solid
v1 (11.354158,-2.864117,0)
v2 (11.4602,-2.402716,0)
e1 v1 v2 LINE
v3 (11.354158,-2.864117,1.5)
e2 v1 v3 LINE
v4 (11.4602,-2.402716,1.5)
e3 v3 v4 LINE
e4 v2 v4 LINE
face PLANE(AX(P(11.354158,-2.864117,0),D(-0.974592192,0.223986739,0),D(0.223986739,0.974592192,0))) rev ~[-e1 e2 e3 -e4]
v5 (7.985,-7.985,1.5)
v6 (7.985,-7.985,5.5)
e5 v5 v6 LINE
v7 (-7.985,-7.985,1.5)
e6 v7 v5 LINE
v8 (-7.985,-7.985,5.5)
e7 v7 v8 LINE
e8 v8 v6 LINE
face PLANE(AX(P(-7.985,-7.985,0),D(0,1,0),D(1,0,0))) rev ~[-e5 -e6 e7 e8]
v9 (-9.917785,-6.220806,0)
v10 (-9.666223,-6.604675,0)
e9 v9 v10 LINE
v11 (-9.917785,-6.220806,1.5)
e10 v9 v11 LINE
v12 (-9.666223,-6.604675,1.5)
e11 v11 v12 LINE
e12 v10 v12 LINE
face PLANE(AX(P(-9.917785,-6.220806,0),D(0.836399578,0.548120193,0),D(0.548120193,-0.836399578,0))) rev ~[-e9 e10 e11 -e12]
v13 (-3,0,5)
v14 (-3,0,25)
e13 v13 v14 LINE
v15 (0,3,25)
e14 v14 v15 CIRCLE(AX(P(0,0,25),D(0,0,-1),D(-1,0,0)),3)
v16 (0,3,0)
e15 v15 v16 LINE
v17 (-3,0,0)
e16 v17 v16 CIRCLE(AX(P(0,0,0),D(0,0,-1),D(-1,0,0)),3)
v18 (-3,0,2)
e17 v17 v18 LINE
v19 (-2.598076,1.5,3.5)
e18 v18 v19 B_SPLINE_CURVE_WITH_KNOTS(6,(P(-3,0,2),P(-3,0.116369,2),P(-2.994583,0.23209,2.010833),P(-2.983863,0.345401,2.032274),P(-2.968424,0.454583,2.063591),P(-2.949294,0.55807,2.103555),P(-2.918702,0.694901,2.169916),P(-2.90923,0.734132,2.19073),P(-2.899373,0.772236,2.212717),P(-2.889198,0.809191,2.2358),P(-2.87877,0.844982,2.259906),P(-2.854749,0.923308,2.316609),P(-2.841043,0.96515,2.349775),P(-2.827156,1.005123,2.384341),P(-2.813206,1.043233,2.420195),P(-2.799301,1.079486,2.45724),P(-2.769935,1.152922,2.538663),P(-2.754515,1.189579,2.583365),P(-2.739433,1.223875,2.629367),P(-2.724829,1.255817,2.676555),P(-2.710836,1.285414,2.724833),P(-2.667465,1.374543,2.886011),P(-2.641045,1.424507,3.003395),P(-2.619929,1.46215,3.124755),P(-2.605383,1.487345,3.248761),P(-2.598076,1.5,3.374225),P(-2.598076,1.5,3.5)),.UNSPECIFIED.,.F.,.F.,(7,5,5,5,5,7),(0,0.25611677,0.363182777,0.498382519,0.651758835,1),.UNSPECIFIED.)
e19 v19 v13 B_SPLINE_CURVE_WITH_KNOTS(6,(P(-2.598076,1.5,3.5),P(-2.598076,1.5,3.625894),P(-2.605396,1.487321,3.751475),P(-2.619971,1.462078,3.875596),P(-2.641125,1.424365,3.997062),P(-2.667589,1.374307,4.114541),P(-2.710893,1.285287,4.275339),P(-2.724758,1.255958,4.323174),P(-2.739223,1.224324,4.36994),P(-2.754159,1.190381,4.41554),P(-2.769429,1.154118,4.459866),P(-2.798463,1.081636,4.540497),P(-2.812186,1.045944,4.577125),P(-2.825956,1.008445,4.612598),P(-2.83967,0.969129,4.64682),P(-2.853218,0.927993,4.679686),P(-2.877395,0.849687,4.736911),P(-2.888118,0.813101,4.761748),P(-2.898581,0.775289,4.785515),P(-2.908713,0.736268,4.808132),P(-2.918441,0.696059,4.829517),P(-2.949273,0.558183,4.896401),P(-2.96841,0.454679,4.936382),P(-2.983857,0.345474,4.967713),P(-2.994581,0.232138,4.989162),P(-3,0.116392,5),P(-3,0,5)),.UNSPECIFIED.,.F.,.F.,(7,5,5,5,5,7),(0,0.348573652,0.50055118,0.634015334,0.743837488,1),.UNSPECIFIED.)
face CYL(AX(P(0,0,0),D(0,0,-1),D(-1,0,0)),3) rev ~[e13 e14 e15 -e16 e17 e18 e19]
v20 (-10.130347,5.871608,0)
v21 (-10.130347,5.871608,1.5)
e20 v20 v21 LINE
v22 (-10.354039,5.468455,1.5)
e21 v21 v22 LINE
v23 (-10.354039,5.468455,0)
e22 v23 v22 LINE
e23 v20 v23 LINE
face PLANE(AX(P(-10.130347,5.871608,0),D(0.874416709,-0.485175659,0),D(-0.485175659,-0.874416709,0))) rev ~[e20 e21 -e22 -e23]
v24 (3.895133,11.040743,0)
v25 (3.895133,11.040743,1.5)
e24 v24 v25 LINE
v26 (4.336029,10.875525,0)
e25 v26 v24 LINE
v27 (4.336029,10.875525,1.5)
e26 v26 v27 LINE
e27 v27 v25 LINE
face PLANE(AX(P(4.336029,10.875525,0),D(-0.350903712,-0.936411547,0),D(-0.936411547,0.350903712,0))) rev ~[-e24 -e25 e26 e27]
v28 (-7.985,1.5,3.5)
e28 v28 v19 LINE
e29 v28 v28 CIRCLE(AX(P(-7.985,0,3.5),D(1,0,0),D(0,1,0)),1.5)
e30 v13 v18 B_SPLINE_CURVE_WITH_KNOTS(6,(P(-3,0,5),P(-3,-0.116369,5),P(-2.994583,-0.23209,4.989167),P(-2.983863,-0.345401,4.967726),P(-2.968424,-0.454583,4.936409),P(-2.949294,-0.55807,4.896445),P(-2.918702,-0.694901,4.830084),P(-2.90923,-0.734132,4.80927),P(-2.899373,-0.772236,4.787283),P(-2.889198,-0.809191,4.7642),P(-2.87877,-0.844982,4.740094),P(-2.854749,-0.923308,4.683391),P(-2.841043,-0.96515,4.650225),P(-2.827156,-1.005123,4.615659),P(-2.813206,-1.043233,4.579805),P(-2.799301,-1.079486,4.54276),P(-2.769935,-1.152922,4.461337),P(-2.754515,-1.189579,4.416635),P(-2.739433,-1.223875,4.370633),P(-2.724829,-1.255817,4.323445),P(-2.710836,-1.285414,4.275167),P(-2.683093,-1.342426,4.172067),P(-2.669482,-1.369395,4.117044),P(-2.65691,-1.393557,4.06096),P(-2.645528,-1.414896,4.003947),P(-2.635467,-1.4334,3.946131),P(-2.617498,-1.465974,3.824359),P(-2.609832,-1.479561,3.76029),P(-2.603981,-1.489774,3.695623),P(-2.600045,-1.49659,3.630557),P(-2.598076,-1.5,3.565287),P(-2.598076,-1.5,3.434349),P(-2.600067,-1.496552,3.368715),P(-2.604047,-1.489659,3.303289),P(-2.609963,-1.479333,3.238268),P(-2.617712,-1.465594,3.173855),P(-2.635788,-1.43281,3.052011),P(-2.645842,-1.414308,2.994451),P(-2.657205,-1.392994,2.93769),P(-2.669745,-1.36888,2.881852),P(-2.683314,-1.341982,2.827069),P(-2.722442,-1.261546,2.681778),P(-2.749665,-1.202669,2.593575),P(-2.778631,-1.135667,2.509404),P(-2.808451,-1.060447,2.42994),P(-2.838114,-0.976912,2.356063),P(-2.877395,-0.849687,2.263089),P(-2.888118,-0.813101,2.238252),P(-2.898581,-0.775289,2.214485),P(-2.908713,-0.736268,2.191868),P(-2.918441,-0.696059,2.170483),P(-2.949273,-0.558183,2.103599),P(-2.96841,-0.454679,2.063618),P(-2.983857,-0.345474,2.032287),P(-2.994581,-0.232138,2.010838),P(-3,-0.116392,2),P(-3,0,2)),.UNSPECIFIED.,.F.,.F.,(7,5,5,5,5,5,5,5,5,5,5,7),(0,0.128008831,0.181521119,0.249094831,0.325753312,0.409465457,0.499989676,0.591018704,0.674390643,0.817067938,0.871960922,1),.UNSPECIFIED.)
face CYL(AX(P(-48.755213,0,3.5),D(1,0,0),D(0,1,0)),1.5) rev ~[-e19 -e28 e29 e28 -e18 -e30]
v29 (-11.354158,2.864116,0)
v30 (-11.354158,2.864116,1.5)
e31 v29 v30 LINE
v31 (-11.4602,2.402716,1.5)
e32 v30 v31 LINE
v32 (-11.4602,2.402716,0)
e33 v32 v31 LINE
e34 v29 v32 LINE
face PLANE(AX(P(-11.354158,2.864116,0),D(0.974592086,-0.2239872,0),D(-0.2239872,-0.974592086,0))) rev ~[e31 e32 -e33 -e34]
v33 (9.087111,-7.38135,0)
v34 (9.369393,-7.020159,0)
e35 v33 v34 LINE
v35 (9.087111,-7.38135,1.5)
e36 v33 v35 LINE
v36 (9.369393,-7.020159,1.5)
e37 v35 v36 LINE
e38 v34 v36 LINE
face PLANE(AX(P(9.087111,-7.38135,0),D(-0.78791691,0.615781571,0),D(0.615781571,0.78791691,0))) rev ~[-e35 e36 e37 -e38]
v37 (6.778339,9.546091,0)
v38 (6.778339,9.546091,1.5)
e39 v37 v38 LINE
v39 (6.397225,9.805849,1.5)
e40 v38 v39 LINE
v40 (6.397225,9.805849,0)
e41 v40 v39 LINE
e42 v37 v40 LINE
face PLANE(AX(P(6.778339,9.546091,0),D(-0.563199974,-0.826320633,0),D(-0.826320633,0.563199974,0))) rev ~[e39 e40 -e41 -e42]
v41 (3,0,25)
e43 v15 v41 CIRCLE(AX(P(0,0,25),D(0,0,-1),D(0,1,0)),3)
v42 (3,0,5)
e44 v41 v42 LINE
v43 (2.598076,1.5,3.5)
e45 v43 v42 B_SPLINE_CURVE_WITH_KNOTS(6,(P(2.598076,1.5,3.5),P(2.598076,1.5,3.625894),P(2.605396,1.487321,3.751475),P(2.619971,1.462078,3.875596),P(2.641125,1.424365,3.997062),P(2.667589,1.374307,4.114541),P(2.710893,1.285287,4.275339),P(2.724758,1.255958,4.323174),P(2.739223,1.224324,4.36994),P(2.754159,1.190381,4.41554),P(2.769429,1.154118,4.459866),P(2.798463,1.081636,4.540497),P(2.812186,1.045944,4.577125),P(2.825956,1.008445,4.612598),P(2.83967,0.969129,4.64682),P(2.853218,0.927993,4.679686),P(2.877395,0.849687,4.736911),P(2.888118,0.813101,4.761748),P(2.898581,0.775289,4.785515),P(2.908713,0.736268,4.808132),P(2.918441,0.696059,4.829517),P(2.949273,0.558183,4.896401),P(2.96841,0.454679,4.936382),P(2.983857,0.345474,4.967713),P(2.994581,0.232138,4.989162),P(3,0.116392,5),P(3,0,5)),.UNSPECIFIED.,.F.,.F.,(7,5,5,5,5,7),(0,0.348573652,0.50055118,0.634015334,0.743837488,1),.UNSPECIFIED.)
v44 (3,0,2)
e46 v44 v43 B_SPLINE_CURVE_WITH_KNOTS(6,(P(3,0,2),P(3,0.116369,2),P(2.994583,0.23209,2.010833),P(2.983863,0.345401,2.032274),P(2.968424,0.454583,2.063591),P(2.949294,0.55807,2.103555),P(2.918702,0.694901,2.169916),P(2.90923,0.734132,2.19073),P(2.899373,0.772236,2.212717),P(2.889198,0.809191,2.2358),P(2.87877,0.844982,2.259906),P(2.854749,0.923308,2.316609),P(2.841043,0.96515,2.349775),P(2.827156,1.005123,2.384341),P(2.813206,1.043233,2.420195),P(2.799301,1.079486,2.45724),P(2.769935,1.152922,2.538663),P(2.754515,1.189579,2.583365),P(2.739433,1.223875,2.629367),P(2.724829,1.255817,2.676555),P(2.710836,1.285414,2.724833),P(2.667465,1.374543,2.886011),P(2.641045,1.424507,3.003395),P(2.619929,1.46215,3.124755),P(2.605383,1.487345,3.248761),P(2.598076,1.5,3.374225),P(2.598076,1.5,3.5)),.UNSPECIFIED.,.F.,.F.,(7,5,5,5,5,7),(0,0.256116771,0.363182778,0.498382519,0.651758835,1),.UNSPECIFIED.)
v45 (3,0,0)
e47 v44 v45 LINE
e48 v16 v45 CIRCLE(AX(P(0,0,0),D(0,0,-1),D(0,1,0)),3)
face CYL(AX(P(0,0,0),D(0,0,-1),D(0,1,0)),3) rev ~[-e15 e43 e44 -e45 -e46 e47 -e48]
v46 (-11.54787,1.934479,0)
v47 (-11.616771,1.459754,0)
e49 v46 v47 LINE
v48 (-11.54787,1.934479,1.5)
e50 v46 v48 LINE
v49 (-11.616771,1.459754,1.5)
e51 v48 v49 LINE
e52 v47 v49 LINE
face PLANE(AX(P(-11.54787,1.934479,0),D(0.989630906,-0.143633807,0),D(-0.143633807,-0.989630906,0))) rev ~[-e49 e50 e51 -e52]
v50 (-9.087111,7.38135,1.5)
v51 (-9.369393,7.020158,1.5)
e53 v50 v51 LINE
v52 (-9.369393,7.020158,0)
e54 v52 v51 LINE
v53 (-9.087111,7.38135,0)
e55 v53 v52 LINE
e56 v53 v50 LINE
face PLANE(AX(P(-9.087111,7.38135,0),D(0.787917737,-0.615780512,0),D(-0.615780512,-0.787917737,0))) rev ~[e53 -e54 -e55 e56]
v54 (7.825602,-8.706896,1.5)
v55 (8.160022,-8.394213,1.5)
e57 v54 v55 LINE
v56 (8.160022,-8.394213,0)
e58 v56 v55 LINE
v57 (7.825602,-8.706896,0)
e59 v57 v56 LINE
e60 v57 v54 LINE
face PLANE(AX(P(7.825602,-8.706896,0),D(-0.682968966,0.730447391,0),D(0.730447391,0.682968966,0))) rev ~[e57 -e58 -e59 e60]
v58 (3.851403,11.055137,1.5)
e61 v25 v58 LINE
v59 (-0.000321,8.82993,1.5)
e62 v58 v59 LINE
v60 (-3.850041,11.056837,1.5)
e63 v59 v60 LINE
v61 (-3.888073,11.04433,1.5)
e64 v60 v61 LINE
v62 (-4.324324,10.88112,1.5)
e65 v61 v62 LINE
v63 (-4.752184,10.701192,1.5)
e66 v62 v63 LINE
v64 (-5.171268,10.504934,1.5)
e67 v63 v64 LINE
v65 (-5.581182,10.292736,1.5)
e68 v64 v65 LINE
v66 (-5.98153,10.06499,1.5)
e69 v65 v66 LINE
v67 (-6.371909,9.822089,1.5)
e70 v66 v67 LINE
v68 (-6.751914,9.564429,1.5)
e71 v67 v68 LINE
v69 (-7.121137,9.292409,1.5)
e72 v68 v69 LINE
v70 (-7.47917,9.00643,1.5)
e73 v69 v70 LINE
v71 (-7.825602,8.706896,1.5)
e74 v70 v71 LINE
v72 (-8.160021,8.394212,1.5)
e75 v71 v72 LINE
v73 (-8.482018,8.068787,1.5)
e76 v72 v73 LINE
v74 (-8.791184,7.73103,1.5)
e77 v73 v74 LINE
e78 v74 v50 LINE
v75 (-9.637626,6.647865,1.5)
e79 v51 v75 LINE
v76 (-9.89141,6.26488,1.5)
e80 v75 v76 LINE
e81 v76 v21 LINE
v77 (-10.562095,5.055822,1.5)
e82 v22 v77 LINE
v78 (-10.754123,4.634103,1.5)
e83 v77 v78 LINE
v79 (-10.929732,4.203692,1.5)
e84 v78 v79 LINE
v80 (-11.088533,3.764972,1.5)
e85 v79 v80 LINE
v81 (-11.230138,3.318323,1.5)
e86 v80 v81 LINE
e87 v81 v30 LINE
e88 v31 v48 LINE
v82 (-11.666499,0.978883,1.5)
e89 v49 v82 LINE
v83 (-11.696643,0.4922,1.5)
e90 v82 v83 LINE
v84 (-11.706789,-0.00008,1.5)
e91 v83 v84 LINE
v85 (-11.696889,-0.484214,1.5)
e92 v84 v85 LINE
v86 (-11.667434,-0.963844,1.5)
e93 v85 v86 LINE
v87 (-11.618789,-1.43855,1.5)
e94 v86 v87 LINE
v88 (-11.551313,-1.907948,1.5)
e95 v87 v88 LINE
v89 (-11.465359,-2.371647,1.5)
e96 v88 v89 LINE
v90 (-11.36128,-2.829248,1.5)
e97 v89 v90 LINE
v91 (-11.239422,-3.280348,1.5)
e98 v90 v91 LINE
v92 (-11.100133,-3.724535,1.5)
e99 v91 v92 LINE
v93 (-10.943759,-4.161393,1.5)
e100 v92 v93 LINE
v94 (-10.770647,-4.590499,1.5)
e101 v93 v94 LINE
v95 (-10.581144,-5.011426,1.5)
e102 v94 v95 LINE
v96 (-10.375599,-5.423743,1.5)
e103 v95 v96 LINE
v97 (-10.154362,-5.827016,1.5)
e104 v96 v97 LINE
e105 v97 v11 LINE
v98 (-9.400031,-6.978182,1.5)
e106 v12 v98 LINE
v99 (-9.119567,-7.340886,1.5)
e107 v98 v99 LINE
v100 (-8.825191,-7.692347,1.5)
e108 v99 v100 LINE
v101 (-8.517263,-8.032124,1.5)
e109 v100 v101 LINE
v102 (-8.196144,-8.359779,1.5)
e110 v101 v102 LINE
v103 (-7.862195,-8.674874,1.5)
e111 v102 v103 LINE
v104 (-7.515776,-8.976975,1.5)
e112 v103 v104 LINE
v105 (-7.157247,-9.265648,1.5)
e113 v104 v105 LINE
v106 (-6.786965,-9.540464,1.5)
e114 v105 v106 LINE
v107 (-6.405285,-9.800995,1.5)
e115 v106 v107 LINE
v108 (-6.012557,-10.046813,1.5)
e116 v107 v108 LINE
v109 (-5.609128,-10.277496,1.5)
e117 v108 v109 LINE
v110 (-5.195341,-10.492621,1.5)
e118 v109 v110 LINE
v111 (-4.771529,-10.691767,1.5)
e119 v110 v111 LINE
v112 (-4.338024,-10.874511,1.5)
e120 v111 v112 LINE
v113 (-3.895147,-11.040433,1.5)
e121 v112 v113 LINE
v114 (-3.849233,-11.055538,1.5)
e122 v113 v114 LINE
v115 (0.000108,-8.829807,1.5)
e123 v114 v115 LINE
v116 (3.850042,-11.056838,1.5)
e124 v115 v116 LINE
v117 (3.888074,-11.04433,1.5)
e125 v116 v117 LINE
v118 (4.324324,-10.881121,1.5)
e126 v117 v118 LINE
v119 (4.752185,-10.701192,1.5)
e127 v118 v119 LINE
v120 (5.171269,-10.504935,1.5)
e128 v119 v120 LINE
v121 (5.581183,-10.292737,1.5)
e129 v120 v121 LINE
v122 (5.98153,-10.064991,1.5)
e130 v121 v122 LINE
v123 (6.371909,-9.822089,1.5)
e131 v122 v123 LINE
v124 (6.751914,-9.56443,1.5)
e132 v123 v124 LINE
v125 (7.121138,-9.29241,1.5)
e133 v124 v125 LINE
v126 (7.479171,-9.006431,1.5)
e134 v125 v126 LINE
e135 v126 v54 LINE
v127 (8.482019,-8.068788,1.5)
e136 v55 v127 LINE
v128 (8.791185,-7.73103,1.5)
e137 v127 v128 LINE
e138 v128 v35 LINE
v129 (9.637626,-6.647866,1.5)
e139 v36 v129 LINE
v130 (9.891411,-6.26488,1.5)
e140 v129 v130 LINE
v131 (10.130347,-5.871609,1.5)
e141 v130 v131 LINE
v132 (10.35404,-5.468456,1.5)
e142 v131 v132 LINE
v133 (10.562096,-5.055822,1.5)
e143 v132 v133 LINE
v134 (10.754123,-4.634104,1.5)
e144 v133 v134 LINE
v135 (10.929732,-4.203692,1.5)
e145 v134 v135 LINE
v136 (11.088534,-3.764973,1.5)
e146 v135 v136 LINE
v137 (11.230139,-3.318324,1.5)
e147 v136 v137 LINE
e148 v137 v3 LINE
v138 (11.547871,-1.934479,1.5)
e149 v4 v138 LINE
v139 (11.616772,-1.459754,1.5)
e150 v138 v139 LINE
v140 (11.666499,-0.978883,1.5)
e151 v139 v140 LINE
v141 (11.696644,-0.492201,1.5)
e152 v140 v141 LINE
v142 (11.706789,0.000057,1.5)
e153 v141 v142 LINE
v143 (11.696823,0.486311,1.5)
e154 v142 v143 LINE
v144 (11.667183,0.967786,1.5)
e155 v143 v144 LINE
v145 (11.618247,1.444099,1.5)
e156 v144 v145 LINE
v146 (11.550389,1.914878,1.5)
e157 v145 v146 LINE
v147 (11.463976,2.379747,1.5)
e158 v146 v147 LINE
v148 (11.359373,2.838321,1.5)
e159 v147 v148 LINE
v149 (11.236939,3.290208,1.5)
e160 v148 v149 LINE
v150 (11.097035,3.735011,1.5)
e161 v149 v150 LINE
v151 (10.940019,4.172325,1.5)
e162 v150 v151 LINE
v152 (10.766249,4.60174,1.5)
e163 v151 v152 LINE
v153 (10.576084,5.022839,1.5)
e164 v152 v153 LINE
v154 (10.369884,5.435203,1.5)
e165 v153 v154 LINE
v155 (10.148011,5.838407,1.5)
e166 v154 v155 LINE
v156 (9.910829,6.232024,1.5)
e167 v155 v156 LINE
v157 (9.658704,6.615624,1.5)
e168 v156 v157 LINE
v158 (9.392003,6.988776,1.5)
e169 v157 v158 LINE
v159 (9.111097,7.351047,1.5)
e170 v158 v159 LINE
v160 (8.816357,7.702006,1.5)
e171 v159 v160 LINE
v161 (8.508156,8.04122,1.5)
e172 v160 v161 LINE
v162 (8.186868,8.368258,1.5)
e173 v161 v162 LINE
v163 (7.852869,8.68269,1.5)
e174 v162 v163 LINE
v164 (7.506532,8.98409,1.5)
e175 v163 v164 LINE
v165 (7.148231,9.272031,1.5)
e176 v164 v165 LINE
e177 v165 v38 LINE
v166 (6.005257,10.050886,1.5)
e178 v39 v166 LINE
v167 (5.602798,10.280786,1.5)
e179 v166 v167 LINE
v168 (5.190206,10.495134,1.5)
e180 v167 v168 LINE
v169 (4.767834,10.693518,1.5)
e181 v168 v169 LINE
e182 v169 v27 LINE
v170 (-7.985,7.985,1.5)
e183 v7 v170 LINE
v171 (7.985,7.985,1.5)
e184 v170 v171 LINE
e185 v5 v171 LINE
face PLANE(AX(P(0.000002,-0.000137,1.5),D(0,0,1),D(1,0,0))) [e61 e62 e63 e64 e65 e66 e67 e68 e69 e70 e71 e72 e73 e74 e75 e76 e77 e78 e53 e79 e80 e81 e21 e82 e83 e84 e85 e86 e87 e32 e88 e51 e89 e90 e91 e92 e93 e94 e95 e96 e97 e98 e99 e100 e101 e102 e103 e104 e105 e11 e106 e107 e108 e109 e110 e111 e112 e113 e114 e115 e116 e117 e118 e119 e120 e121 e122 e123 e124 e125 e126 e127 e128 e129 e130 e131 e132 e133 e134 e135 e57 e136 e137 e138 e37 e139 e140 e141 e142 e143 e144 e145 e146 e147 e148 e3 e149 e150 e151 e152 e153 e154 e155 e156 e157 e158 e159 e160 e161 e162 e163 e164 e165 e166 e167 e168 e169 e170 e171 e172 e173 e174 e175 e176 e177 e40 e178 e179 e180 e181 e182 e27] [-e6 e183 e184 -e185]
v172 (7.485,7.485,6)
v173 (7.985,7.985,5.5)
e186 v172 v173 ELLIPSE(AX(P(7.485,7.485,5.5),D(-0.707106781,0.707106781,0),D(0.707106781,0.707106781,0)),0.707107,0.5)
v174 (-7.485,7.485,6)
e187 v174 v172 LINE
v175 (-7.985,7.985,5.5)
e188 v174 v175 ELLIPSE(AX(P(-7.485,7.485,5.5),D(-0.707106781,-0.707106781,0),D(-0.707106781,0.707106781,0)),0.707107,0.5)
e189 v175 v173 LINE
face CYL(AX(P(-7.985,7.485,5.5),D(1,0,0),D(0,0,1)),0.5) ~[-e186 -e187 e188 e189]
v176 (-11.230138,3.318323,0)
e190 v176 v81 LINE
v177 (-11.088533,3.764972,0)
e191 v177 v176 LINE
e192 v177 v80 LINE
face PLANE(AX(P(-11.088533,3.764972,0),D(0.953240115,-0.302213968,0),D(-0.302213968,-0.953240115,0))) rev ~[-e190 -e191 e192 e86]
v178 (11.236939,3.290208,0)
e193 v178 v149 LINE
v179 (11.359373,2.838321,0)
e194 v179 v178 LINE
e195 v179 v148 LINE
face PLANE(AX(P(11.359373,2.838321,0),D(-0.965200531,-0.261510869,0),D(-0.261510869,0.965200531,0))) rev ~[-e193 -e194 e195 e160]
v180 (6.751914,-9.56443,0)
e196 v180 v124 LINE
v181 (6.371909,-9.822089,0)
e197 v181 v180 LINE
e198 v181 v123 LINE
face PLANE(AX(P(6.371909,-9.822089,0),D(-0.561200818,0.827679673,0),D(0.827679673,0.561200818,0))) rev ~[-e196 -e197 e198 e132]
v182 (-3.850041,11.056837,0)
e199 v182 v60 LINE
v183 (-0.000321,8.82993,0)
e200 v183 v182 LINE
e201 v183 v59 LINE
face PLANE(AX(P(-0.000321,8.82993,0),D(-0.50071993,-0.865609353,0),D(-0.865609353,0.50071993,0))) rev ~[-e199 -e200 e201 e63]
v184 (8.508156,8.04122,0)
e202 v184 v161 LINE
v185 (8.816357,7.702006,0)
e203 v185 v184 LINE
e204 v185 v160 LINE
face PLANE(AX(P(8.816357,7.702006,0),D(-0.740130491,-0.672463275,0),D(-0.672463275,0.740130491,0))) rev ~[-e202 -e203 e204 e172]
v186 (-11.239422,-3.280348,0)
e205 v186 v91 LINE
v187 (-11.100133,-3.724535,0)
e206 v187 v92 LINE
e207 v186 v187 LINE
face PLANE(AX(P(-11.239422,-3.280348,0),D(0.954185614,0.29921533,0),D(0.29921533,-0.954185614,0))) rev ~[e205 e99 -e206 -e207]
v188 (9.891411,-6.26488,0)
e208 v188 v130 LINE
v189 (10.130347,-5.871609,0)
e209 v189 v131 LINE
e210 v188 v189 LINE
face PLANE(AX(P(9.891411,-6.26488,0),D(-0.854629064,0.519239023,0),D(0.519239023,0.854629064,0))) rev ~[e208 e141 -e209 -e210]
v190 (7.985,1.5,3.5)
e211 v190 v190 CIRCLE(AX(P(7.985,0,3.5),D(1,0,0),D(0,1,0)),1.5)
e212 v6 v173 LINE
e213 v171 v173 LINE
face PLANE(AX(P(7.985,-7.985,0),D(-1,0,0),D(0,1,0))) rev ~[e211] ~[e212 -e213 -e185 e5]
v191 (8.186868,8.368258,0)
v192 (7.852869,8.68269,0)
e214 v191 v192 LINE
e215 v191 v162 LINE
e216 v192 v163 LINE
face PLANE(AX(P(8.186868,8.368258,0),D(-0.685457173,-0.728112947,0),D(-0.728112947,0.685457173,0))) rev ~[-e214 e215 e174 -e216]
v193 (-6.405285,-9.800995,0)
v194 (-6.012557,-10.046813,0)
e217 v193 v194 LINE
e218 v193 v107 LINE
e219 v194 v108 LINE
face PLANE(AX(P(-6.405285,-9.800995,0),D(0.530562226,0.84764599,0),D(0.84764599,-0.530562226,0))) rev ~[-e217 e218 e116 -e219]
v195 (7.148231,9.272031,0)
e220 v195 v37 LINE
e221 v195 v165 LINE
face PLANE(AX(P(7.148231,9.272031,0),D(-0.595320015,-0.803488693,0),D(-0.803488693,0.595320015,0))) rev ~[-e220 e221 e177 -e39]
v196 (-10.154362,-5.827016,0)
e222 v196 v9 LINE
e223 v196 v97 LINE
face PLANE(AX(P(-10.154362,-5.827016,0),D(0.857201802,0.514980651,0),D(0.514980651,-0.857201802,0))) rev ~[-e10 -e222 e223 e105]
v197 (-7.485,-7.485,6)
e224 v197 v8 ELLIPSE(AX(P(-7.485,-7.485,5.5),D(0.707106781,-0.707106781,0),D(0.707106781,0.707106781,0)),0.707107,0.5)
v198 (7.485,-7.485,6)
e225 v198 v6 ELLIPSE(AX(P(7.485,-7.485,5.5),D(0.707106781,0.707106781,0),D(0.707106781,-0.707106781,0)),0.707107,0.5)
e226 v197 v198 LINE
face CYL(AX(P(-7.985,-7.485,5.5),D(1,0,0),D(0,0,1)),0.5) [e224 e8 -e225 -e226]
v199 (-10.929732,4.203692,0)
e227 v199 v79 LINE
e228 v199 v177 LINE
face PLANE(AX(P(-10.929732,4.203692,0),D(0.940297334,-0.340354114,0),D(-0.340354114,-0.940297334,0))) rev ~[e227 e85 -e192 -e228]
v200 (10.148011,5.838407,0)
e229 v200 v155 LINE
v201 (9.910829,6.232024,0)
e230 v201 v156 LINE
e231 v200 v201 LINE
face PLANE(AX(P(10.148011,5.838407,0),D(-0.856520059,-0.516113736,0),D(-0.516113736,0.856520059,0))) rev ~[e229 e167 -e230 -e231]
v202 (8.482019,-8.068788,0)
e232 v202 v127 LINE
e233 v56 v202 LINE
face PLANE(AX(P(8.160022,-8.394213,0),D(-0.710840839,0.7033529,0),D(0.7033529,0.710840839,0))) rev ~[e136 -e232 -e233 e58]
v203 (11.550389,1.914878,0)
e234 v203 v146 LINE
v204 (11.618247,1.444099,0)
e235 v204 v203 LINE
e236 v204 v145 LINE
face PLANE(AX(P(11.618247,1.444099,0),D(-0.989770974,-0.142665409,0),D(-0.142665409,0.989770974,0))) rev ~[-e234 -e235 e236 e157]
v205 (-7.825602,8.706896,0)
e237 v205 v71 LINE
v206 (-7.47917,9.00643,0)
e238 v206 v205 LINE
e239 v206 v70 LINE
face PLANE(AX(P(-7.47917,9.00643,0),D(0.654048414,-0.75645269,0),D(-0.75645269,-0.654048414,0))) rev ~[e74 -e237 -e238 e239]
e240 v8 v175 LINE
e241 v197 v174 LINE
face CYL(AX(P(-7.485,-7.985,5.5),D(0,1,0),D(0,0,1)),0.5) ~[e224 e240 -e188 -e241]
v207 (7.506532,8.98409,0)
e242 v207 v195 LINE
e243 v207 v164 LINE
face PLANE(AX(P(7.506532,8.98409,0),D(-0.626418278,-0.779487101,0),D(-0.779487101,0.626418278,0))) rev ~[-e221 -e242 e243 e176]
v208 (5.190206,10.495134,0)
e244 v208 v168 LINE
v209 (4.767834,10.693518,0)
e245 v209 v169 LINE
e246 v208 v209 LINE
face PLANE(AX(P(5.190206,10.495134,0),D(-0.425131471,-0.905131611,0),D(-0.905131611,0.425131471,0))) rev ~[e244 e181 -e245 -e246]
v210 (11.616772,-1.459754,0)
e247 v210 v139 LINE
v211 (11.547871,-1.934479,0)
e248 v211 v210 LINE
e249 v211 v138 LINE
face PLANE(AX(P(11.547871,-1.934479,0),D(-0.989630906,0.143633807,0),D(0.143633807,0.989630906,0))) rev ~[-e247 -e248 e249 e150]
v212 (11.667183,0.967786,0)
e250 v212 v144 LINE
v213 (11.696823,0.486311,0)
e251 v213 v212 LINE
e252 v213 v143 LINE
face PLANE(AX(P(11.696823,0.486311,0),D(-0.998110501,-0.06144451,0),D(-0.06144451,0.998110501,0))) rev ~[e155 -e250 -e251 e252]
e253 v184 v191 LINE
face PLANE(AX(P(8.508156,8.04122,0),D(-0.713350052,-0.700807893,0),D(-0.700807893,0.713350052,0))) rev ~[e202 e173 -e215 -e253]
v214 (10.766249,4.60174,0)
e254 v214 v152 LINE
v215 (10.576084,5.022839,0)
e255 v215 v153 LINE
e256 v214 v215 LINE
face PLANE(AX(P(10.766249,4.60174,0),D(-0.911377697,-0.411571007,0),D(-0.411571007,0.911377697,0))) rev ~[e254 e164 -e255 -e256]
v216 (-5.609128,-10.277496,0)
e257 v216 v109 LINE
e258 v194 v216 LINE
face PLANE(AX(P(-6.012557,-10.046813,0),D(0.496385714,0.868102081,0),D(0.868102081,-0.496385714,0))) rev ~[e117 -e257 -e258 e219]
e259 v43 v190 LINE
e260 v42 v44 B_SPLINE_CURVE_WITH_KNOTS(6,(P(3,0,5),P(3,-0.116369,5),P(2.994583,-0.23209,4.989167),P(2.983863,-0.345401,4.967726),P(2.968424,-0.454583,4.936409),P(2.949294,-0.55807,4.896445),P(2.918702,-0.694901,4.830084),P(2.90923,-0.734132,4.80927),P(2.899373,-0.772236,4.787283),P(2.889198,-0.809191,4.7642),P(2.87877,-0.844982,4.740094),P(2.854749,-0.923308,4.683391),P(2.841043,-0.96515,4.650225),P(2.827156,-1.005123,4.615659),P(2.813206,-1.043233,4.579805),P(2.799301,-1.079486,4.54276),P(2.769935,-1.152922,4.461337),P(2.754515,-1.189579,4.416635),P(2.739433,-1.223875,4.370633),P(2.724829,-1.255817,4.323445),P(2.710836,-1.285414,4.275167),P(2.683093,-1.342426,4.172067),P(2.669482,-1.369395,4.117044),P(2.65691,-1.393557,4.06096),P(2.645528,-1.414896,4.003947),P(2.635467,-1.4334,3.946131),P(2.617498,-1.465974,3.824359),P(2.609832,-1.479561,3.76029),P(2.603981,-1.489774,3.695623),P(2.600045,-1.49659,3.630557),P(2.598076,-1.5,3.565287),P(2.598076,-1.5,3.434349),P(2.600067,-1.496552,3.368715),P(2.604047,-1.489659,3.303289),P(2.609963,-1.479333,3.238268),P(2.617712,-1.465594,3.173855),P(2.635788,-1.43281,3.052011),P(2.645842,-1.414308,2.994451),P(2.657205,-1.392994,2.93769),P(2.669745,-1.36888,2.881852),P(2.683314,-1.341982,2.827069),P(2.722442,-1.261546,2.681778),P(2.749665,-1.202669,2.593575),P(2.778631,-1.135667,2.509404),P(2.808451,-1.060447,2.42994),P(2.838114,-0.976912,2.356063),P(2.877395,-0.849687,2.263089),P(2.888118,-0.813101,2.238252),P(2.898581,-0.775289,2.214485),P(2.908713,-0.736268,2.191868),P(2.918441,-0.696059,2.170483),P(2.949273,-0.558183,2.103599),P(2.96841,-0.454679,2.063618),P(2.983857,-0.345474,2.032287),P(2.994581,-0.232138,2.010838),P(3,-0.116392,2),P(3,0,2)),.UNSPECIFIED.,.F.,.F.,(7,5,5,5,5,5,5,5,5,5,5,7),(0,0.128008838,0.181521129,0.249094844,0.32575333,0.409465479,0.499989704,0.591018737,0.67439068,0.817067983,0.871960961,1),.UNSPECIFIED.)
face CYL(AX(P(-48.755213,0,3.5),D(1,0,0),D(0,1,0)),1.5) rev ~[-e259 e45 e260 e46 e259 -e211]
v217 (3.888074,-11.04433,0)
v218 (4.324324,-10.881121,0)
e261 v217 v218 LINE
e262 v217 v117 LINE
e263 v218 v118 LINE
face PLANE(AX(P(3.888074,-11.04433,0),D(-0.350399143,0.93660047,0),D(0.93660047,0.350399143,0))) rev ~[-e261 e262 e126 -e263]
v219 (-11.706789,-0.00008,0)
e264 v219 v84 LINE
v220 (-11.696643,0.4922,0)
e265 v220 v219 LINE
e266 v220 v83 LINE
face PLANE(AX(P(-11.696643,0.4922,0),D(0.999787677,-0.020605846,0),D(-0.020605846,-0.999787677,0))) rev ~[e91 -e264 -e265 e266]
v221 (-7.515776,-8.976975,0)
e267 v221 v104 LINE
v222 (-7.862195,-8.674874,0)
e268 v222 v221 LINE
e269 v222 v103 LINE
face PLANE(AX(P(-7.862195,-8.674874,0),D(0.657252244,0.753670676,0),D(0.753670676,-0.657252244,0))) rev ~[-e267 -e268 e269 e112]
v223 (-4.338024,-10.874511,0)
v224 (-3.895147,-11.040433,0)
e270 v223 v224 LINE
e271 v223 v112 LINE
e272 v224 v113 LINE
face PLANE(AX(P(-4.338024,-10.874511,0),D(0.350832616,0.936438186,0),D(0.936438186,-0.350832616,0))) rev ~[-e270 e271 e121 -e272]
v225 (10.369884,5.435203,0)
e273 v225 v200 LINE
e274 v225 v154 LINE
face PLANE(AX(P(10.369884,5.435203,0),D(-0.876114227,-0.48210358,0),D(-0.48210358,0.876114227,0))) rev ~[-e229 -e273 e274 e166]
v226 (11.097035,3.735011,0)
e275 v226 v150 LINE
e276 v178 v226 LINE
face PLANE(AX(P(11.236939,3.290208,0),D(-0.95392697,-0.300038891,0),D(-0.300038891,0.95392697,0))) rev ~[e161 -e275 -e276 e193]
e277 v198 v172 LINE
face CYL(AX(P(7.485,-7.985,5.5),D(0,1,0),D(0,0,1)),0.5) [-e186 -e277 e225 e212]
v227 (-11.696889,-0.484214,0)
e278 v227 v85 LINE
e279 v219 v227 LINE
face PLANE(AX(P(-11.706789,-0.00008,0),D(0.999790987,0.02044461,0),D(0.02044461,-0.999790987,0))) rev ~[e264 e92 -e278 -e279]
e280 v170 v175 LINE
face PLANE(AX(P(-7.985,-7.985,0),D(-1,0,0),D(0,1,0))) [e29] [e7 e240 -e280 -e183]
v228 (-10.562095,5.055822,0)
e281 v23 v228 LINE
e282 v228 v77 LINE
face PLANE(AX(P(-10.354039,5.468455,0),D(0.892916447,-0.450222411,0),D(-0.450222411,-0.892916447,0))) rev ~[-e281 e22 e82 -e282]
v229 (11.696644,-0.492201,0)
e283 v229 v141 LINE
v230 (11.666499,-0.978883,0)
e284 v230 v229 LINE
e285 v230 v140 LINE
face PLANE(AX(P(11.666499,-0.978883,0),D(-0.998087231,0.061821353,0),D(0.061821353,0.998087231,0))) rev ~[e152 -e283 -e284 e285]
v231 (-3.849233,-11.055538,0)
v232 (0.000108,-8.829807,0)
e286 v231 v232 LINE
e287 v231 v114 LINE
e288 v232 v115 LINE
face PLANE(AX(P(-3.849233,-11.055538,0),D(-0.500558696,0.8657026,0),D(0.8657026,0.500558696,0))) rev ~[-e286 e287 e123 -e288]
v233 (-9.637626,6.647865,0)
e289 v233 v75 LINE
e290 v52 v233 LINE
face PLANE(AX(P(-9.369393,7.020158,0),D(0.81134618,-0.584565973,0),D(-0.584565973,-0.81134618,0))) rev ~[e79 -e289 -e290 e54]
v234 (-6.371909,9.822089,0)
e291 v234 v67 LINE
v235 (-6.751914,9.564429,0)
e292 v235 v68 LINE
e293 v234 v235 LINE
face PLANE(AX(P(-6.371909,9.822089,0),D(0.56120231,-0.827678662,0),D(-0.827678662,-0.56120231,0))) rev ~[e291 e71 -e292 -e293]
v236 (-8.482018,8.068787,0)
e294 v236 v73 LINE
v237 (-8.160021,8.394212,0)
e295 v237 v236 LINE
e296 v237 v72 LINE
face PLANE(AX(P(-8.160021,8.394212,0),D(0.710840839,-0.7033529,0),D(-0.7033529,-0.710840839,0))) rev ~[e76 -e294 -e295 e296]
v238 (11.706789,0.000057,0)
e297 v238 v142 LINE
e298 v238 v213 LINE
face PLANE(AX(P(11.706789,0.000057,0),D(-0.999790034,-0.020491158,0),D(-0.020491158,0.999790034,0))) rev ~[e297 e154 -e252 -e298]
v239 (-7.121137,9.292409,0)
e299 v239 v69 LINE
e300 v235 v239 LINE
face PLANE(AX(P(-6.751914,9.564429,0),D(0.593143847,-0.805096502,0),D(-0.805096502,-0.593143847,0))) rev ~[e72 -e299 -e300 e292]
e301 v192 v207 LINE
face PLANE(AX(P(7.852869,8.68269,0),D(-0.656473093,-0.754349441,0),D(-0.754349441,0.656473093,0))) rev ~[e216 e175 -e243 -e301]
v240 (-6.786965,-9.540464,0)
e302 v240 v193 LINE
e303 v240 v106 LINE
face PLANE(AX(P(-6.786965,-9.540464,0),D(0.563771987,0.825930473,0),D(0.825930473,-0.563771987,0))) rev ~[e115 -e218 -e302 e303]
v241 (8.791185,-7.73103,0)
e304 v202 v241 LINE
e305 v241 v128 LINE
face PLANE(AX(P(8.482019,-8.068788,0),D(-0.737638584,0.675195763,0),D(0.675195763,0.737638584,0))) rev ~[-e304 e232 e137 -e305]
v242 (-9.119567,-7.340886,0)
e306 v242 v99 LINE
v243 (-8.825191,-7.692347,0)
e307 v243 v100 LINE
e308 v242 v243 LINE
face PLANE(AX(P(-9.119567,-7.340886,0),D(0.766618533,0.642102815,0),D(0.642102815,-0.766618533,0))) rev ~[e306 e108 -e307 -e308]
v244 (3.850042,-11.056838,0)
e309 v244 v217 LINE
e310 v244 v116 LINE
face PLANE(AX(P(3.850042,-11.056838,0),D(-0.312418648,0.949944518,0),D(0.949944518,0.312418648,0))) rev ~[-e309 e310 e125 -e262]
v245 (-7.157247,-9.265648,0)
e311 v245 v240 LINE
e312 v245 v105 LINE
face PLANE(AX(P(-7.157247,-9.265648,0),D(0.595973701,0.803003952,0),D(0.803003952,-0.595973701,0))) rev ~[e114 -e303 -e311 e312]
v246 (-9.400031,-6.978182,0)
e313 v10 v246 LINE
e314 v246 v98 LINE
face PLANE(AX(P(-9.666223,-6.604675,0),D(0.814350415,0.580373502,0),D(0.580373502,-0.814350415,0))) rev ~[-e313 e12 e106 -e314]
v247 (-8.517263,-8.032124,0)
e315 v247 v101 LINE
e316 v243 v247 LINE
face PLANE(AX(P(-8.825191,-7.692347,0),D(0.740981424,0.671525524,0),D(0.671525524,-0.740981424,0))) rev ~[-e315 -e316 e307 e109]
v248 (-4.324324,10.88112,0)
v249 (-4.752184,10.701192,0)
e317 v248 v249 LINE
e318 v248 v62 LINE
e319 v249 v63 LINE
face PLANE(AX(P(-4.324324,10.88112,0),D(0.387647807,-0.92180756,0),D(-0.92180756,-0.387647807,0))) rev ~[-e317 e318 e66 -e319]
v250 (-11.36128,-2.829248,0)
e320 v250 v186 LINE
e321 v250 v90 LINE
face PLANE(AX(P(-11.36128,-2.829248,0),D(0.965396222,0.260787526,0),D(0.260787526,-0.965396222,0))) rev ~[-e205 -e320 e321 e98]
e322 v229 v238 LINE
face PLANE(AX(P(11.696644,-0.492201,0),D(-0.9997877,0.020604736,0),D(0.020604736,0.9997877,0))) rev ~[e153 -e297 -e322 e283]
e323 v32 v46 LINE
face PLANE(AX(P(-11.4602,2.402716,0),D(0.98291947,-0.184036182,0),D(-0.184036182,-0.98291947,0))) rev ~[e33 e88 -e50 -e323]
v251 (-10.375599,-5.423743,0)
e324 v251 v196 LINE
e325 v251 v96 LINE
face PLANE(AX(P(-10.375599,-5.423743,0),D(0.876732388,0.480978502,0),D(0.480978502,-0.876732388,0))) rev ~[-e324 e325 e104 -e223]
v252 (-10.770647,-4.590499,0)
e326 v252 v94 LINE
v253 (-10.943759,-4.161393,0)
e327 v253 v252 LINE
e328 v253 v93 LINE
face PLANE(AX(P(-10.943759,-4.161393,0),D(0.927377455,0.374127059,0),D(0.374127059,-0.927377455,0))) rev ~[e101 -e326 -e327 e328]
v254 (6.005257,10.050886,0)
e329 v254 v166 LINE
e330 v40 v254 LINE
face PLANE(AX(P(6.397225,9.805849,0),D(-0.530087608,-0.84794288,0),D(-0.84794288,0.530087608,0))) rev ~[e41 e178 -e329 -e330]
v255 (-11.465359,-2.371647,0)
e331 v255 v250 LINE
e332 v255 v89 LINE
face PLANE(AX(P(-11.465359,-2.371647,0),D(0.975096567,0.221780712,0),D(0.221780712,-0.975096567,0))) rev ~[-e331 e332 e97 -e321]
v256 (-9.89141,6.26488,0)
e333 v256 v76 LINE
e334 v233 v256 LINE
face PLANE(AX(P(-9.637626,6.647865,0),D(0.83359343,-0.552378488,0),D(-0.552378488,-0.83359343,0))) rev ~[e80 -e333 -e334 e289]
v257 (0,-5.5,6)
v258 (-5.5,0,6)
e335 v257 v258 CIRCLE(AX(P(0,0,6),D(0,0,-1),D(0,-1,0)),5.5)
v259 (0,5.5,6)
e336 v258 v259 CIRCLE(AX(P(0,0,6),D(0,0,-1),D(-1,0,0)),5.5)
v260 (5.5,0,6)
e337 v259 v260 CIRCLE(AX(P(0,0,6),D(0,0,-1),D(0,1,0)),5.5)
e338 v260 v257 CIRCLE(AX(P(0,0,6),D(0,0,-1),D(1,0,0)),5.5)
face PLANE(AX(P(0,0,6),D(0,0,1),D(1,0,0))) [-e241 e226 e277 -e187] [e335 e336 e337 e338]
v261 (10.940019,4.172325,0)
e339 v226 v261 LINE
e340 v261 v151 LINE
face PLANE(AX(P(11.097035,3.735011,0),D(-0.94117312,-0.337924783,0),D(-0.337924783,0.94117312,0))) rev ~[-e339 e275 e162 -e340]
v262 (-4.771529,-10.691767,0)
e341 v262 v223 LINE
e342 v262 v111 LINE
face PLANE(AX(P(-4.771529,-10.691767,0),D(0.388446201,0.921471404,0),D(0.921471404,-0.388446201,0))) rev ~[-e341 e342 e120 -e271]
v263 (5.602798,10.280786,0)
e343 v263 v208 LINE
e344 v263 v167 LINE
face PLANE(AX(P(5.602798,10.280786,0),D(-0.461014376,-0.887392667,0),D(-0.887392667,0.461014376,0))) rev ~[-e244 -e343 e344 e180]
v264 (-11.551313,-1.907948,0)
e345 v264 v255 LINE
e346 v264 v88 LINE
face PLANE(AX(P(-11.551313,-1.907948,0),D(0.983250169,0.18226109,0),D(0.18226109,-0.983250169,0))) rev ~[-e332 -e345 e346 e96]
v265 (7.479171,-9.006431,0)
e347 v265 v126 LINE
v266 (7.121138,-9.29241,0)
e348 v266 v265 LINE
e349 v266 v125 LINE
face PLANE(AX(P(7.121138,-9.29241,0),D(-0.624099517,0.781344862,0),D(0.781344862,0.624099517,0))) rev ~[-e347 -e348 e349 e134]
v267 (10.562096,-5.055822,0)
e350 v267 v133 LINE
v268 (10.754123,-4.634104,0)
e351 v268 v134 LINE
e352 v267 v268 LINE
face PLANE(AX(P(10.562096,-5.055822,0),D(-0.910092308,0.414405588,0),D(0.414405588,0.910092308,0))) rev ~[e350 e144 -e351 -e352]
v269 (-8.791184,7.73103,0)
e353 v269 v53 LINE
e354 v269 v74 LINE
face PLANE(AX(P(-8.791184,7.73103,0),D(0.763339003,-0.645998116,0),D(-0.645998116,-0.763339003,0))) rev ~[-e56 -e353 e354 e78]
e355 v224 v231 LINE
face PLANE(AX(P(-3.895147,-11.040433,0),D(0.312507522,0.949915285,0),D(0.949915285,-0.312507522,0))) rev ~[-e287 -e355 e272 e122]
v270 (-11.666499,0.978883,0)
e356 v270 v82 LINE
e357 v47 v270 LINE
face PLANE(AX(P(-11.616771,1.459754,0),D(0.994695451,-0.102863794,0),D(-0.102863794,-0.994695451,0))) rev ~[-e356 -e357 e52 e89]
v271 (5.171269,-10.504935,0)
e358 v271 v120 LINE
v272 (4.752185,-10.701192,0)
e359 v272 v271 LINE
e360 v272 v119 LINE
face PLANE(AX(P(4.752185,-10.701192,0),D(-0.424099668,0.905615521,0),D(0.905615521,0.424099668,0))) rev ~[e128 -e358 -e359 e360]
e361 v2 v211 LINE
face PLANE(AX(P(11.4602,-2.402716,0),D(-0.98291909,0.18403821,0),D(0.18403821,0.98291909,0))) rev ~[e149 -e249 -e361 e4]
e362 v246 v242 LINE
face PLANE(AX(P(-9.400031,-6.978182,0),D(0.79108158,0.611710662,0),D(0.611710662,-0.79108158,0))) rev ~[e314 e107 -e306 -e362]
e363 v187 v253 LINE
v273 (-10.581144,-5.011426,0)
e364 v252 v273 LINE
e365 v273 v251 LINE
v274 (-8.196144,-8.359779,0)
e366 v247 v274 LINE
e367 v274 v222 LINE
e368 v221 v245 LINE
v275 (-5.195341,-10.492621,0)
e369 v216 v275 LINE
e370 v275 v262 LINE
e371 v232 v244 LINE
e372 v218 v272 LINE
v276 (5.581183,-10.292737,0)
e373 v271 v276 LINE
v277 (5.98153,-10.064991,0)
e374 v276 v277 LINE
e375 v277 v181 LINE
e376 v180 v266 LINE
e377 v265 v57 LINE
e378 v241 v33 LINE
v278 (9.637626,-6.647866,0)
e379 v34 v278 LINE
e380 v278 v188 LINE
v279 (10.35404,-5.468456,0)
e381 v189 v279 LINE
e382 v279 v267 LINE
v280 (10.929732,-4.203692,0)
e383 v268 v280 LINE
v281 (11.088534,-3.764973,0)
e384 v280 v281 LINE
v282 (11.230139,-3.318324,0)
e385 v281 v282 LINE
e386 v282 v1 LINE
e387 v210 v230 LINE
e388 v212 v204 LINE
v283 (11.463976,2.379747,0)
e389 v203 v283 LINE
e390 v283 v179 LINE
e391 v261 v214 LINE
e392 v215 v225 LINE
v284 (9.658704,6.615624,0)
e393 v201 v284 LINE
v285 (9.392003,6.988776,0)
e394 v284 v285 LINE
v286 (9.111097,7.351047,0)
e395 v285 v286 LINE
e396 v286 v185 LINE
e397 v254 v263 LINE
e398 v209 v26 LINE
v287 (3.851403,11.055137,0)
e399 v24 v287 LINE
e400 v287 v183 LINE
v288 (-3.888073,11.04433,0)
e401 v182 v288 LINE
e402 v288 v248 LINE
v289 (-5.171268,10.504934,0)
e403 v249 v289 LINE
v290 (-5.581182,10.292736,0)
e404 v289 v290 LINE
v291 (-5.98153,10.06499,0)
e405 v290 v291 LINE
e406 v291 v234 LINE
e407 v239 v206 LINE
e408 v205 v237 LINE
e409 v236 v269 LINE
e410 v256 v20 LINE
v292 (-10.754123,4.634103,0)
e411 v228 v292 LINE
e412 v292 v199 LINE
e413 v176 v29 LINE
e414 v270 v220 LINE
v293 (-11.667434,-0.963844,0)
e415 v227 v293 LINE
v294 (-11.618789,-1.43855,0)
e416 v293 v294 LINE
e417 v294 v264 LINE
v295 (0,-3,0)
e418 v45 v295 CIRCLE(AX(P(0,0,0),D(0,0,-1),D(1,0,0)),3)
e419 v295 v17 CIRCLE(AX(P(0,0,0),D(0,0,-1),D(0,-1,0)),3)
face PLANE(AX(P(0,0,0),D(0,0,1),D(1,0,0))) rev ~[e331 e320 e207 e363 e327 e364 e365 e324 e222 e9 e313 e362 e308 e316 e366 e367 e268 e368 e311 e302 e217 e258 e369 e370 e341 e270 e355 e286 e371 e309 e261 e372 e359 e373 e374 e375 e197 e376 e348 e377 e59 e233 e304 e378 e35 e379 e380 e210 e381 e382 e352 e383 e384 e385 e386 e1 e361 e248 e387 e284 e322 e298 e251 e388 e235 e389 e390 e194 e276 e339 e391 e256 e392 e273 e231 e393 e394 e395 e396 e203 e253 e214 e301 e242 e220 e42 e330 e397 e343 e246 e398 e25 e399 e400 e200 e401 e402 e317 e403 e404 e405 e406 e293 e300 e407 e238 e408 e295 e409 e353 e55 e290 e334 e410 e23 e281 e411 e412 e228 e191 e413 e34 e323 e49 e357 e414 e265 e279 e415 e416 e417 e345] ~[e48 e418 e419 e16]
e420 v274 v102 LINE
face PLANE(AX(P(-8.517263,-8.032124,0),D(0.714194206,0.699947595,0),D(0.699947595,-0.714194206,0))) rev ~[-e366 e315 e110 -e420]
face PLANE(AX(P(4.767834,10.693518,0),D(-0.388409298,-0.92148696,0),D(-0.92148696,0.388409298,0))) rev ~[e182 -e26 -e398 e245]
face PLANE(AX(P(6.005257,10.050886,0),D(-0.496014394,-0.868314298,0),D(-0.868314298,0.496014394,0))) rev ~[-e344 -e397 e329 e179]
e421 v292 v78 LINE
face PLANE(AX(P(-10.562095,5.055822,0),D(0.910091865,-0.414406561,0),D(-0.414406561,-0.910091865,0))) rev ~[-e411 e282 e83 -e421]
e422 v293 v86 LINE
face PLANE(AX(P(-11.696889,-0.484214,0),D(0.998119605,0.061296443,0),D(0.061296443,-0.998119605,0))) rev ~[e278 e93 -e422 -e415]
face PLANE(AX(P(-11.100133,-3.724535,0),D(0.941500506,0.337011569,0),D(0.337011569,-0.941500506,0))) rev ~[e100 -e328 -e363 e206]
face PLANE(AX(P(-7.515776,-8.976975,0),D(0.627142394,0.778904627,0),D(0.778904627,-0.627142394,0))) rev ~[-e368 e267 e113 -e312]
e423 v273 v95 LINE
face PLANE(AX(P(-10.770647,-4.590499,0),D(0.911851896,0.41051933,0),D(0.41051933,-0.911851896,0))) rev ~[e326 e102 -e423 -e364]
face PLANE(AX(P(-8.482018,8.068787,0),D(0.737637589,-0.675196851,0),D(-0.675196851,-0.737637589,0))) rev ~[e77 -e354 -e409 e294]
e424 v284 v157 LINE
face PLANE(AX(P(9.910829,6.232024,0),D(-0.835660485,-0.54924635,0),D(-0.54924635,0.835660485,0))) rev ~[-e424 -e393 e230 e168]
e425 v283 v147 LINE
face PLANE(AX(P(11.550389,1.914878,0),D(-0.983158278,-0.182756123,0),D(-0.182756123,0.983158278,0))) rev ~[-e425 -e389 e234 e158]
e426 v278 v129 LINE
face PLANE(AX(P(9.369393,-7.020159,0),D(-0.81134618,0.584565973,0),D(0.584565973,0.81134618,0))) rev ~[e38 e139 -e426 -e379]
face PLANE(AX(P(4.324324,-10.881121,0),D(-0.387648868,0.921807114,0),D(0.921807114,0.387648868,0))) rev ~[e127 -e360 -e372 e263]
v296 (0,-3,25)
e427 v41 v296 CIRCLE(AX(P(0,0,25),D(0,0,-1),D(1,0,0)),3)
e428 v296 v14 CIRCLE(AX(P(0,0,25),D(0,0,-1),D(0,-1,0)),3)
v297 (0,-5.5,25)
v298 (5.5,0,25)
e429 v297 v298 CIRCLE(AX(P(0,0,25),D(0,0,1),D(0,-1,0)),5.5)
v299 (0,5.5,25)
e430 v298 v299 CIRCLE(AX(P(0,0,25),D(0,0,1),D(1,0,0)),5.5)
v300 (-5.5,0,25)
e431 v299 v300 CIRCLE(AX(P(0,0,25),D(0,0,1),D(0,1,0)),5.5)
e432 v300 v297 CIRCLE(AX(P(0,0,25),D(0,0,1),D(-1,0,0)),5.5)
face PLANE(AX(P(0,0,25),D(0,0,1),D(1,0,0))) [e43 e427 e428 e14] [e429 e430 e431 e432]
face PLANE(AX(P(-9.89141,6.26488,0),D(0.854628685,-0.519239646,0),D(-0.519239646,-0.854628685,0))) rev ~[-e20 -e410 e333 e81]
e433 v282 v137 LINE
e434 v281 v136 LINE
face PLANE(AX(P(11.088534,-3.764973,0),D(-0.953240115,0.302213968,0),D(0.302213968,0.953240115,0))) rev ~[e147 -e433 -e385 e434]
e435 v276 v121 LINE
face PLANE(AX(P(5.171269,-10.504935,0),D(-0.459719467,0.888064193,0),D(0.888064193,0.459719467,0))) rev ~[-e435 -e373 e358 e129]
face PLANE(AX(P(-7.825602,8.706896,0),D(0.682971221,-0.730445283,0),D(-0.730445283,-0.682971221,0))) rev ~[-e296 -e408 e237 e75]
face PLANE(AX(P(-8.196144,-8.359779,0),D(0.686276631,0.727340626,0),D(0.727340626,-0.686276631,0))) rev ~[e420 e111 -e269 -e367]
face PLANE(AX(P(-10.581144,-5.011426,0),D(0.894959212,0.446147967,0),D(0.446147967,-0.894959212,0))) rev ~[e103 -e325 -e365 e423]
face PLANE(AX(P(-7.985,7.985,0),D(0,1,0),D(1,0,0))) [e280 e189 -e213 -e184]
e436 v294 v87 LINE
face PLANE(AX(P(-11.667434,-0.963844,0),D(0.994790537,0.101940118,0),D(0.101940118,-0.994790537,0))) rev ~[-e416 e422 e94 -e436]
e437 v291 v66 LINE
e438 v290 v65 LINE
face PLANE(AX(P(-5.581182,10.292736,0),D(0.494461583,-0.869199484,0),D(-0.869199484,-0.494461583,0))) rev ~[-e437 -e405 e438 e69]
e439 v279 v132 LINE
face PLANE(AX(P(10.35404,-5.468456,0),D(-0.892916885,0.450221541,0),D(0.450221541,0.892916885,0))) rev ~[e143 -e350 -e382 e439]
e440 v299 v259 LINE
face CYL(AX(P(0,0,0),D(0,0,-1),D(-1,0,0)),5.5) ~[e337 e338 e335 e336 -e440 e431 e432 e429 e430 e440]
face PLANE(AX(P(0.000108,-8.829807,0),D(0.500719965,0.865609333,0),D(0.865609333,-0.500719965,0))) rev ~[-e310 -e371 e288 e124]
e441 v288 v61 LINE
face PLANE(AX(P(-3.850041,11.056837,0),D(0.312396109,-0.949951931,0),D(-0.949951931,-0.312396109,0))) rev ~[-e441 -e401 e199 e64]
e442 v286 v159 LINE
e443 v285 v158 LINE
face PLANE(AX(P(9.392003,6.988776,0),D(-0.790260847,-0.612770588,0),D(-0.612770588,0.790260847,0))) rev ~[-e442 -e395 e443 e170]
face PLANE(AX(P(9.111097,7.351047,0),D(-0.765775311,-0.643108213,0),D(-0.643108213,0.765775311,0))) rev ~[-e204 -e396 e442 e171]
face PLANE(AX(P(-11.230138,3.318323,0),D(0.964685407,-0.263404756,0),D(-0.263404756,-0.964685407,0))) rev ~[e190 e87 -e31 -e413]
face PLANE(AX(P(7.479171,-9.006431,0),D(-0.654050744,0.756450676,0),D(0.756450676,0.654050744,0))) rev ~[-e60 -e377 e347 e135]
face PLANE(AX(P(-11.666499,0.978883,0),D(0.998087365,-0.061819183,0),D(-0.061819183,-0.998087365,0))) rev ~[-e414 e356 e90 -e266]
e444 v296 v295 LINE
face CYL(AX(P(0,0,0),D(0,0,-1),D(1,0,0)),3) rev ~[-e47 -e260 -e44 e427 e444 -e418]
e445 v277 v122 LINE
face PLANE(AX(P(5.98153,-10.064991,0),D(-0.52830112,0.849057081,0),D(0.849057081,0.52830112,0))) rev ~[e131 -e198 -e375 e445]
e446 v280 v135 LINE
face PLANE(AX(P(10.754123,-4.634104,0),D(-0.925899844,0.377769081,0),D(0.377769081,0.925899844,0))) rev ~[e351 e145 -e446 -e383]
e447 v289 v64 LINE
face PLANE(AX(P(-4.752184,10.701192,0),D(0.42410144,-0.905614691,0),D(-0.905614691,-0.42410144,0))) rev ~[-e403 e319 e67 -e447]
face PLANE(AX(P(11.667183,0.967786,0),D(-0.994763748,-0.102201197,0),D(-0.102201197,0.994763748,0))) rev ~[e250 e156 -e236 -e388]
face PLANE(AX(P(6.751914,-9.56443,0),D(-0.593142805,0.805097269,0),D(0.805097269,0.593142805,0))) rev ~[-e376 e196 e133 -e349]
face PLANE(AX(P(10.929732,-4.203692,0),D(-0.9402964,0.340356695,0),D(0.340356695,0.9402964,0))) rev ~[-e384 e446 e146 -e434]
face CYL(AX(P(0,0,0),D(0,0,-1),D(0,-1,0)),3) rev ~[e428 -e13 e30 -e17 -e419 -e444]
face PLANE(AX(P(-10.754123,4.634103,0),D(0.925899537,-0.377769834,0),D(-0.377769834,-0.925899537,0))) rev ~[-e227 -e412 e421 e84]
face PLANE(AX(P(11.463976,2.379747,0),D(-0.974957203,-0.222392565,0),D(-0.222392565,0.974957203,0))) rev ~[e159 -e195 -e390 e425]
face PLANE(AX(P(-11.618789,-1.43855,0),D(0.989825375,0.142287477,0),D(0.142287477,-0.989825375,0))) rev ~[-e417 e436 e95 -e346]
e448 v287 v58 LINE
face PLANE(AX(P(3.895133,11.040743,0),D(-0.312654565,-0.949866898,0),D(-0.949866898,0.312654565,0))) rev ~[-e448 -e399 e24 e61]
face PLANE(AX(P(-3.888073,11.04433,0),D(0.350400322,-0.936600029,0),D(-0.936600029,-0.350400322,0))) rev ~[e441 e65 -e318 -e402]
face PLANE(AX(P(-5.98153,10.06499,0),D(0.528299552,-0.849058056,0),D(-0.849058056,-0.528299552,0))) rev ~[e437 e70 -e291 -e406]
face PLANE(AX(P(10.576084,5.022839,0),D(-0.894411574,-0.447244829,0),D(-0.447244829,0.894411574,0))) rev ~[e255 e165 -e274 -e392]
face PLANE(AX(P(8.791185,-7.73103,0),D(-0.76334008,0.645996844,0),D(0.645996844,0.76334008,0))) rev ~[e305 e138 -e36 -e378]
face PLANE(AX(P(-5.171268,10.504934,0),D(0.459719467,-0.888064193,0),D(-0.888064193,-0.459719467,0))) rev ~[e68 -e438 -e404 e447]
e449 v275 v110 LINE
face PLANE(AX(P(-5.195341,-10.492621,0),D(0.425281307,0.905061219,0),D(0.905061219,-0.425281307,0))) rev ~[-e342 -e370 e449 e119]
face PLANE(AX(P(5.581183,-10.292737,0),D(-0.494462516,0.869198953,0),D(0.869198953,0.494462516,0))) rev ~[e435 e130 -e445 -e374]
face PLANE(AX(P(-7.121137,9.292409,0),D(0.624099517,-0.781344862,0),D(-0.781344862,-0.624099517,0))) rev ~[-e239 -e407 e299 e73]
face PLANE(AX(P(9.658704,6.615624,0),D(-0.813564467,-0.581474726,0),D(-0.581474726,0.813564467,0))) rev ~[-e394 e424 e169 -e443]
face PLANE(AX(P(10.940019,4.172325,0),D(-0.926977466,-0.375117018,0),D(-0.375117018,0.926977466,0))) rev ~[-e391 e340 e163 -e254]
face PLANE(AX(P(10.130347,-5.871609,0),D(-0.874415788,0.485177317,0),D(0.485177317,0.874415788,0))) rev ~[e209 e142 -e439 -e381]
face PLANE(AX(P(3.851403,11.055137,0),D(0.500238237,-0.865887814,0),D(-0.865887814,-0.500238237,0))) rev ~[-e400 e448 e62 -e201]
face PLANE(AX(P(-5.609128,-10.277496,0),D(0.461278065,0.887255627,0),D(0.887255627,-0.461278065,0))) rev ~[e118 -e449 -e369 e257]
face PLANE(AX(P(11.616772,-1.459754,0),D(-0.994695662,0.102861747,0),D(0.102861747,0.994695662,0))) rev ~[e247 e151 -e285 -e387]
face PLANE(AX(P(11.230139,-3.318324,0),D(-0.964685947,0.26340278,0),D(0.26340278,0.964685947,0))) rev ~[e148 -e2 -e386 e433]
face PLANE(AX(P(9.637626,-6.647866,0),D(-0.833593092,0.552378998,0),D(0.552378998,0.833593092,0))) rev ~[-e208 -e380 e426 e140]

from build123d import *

# Parameters (mm, degrees)
F0_W     = 15.97
F0_H     = 15.97
F1_DEPTH = 1.5
F2_DEPTH = 6
F3_DEPTH = 14
F4_R     = 0.5
F5_DEPTH = 25
F7_D     = 3


# Not quite as in the source:
# - after a boolean that leaves OpenCascade's solid faulty, fix() repairs it


with BuildPart() as f1:
    # F0 (on Top) → F1 (new body)
    with BuildSketch(Plane.XY):
        Polygon((11.463976, 2.379747), (11.359373, 2.838321), (11.236939, 3.290208), (11.097035, 3.735011), (10.940019, 4.172325), (10.766249, 4.60174), (10.576084, 5.022839), (10.369884, 5.435203), (10.148011, 5.838407), (9.910829, 6.232024), (9.658704, 6.615624), (9.392003, 6.988776), (9.111097, 7.351047), (8.816357, 7.702006), (8.508156, 8.04122), (8.186868, 8.368258), (7.852869, 8.68269), (7.506532, 8.98409), (7.148231, 9.272031), (6.778339, 9.546091), (6.397225, 9.805849), (6.005257, 10.050886), (5.602798, 10.280786), (5.190206, 10.495134), (4.767834, 10.693518), (4.336029, 10.875525), (3.895133, 11.040743), (3.851403, 11.055137), (-0.000321, 8.82993), (-3.850041, 11.056837), (-3.888073, 11.04433), (-4.324324, 10.88112), (-4.752184, 10.701192), (-5.171268, 10.504934), (-5.581182, 10.292736), (-5.98153, 10.06499), (-6.371909, 9.822089), (-6.751914, 9.564429), (-7.121137, 9.292409), (-7.47917, 9.00643), (-7.825602, 8.706896), (-8.160021, 8.394212), (-8.482018, 8.068787), (-8.791184, 7.73103), (-9.087111, 7.38135), (-9.369393, 7.020158), (-9.637626, 6.647865), (-9.89141, 6.26488), (-10.130347, 5.871608), (-10.354039, 5.468455), (-10.562095, 5.055822), (-10.754123, 4.634103), (-10.929732, 4.203692), (-11.088533, 3.764972), (-11.230138, 3.318323), (-11.354158, 2.864116), (-11.4602, 2.402716), (-11.54787, 1.934479), (-11.616771, 1.459754), (-11.666499, 0.978883), (-11.696643, 0.4922), (-11.706789, -8e-05), (-11.696889, -0.484214), (-11.667434, -0.963844), (-11.618789, -1.43855), (-11.551313, -1.907948), (-11.465359, -2.371647), (-11.36128, -2.829248), (-11.239422, -3.280348), (-11.100133, -3.724535), (-10.943759, -4.161393), (-10.770647, -4.590499), (-10.581144, -5.011426), (-10.375599, -5.423743), (-10.154362, -5.827016), (-9.917785, -6.220806), (-9.666223, -6.604675), (-9.400031, -6.978182), (-9.119567, -7.340886), (-8.825191, -7.692347), (-8.517263, -8.032124), (-8.196144, -8.359779), (-7.862195, -8.674874), (-7.515776, -8.976975), (-7.157247, -9.265648), (-6.786965, -9.540464), (-6.405285, -9.800995), (-6.012557, -10.046813), (-5.609128, -10.277496), (-5.195341, -10.492621), (-4.771529, -10.691767), (-4.338024, -10.874511), (-3.895147, -11.040433), (-3.849233, -11.055538), (0.000108, -8.829807), (3.850042, -11.056838), (3.888074, -11.04433), (4.324324, -10.881121), (4.752185, -10.701192), (5.171269, -10.504935), (5.581183, -10.292737), (5.98153, -10.064991), (6.371909, -9.822089), (6.751914, -9.56443), (7.121138, -9.29241), (7.479171, -9.006431), (7.825602, -8.706896), (8.160022, -8.394213), (8.482019, -8.068788), (8.791185, -7.73103), (9.087111, -7.38135), (9.369393, -7.020159), (9.637626, -6.647866), (9.891411, -6.26488), (10.130347, -5.871609), (10.35404, -5.468456), (10.562096, -5.055822), (10.754123, -4.634104), (10.929732, -4.203692), (11.088534, -3.764973), (11.230139, -3.318324), (11.354158, -2.864117), (11.4602, -2.402716), (11.547871, -1.934479), (11.616772, -1.459754), (11.666499, -0.978883), (11.696644, -0.492201), (11.706789, 5.7e-05), (11.696823, 0.486311), (11.667183, 0.967786), (11.618247, 1.444099), (11.550389, 1.914878), align=None)
        Rectangle(F0_W, F0_H, mode=Mode.SUBTRACT)
    extrude(amount=F1_DEPTH)

    # F0 (on Top) → F2 (join)
    with BuildSketch(Plane.XY):
        Rectangle(F0_W, F0_H)
        with BuildLine():
            ThreePointArc((-5.5, 0), (-3.8890872965, 3.8890872965), (0, 5.5))
            ThreePointArc((0, 5.5), (3.8890872965, 3.8890872965), (5.5, 0))
            ThreePointArc((5.5, 0), (3.8890872965, -3.8890872965), (0, -5.5))
            ThreePointArc((0, -5.5), (-3.8890872965, -3.8890872965), (-5.5, 0))
        make_face(mode=Mode.SUBTRACT)
    extrude(amount=F2_DEPTH)

    # F0 (on Top) → F3 (join)
    with BuildSketch(Plane.XY):
        with BuildLine():
            ThreePointArc((5.5, 0), (3.8890872965, 3.8890872965), (0, 5.5))
            ThreePointArc((0, 5.5), (-3.8890872965, 3.8890872965), (-5.5, 0))
            ThreePointArc((-5.5, 0), (-3.8890872965, -3.8890872965), (0, -5.5))
            ThreePointArc((0, -5.5), (3.8890872965, -3.8890872965), (5.5, 0))
        make_face()
        with BuildLine():
            ThreePointArc((-3, 0), (-2.1213203436, 2.1213203436), (0, 3))
            ThreePointArc((0, 3), (2.1213203436, 2.1213203436), (3, 0))
            ThreePointArc((3, 0), (2.1213203436, -2.1213203436), (0, -3))
            ThreePointArc((0, -3), (-2.1213203436, -2.1213203436), (-3, 0))
        make_face(mode=Mode.SUBTRACT)
    extrude(amount=F3_DEPTH)

    # F4
    f4_edges = [f1.edges().sort_by_distance(p)[0] for p in [
        (-7.985, 0, 6),
        (0, -7.985, 6),
        (7.985, 0, 6),
        (0, 7.985, 6),
    ]]
    fillet(f4_edges, radius=F4_R)

    # F0 (on Top) → F5 (join)
    with BuildSketch(Plane.XY):
        with BuildLine():
            ThreePointArc((5.5, 0), (3.8890872965, 3.8890872965), (0, 5.5))
            ThreePointArc((0, 5.5), (-3.8890872965, 3.8890872965), (-5.5, 0))
            ThreePointArc((-5.5, 0), (-3.8890872965, -3.8890872965), (0, -5.5))
            ThreePointArc((0, -5.5), (3.8890872965, -3.8890872965), (5.5, 0))
        make_face()
        with BuildLine():
            ThreePointArc((-3, 0), (-2.1213203436, 2.1213203436), (0, 3))
            ThreePointArc((0, 3), (2.1213203436, 2.1213203436), (3, 0))
            ThreePointArc((3, 0), (2.1213203436, -2.1213203436), (0, -3))
            ThreePointArc((0, -3), (-2.1213203436, -2.1213203436), (-3, 0))
        make_face(mode=Mode.SUBTRACT)
    extrude(amount=F5_DEPTH)

    # F7 (through all)
    with Locations(Plane(origin=(-7.985, 0, 0), x_dir=(0, -1, 0), z_dir=(-1, 0, 0))):
        with Locations((0, 3.5)):
            Hole(F7_D / 2)

    add(f1.part.fix(), mode=Mode.REPLACE)


solid = f1.part
